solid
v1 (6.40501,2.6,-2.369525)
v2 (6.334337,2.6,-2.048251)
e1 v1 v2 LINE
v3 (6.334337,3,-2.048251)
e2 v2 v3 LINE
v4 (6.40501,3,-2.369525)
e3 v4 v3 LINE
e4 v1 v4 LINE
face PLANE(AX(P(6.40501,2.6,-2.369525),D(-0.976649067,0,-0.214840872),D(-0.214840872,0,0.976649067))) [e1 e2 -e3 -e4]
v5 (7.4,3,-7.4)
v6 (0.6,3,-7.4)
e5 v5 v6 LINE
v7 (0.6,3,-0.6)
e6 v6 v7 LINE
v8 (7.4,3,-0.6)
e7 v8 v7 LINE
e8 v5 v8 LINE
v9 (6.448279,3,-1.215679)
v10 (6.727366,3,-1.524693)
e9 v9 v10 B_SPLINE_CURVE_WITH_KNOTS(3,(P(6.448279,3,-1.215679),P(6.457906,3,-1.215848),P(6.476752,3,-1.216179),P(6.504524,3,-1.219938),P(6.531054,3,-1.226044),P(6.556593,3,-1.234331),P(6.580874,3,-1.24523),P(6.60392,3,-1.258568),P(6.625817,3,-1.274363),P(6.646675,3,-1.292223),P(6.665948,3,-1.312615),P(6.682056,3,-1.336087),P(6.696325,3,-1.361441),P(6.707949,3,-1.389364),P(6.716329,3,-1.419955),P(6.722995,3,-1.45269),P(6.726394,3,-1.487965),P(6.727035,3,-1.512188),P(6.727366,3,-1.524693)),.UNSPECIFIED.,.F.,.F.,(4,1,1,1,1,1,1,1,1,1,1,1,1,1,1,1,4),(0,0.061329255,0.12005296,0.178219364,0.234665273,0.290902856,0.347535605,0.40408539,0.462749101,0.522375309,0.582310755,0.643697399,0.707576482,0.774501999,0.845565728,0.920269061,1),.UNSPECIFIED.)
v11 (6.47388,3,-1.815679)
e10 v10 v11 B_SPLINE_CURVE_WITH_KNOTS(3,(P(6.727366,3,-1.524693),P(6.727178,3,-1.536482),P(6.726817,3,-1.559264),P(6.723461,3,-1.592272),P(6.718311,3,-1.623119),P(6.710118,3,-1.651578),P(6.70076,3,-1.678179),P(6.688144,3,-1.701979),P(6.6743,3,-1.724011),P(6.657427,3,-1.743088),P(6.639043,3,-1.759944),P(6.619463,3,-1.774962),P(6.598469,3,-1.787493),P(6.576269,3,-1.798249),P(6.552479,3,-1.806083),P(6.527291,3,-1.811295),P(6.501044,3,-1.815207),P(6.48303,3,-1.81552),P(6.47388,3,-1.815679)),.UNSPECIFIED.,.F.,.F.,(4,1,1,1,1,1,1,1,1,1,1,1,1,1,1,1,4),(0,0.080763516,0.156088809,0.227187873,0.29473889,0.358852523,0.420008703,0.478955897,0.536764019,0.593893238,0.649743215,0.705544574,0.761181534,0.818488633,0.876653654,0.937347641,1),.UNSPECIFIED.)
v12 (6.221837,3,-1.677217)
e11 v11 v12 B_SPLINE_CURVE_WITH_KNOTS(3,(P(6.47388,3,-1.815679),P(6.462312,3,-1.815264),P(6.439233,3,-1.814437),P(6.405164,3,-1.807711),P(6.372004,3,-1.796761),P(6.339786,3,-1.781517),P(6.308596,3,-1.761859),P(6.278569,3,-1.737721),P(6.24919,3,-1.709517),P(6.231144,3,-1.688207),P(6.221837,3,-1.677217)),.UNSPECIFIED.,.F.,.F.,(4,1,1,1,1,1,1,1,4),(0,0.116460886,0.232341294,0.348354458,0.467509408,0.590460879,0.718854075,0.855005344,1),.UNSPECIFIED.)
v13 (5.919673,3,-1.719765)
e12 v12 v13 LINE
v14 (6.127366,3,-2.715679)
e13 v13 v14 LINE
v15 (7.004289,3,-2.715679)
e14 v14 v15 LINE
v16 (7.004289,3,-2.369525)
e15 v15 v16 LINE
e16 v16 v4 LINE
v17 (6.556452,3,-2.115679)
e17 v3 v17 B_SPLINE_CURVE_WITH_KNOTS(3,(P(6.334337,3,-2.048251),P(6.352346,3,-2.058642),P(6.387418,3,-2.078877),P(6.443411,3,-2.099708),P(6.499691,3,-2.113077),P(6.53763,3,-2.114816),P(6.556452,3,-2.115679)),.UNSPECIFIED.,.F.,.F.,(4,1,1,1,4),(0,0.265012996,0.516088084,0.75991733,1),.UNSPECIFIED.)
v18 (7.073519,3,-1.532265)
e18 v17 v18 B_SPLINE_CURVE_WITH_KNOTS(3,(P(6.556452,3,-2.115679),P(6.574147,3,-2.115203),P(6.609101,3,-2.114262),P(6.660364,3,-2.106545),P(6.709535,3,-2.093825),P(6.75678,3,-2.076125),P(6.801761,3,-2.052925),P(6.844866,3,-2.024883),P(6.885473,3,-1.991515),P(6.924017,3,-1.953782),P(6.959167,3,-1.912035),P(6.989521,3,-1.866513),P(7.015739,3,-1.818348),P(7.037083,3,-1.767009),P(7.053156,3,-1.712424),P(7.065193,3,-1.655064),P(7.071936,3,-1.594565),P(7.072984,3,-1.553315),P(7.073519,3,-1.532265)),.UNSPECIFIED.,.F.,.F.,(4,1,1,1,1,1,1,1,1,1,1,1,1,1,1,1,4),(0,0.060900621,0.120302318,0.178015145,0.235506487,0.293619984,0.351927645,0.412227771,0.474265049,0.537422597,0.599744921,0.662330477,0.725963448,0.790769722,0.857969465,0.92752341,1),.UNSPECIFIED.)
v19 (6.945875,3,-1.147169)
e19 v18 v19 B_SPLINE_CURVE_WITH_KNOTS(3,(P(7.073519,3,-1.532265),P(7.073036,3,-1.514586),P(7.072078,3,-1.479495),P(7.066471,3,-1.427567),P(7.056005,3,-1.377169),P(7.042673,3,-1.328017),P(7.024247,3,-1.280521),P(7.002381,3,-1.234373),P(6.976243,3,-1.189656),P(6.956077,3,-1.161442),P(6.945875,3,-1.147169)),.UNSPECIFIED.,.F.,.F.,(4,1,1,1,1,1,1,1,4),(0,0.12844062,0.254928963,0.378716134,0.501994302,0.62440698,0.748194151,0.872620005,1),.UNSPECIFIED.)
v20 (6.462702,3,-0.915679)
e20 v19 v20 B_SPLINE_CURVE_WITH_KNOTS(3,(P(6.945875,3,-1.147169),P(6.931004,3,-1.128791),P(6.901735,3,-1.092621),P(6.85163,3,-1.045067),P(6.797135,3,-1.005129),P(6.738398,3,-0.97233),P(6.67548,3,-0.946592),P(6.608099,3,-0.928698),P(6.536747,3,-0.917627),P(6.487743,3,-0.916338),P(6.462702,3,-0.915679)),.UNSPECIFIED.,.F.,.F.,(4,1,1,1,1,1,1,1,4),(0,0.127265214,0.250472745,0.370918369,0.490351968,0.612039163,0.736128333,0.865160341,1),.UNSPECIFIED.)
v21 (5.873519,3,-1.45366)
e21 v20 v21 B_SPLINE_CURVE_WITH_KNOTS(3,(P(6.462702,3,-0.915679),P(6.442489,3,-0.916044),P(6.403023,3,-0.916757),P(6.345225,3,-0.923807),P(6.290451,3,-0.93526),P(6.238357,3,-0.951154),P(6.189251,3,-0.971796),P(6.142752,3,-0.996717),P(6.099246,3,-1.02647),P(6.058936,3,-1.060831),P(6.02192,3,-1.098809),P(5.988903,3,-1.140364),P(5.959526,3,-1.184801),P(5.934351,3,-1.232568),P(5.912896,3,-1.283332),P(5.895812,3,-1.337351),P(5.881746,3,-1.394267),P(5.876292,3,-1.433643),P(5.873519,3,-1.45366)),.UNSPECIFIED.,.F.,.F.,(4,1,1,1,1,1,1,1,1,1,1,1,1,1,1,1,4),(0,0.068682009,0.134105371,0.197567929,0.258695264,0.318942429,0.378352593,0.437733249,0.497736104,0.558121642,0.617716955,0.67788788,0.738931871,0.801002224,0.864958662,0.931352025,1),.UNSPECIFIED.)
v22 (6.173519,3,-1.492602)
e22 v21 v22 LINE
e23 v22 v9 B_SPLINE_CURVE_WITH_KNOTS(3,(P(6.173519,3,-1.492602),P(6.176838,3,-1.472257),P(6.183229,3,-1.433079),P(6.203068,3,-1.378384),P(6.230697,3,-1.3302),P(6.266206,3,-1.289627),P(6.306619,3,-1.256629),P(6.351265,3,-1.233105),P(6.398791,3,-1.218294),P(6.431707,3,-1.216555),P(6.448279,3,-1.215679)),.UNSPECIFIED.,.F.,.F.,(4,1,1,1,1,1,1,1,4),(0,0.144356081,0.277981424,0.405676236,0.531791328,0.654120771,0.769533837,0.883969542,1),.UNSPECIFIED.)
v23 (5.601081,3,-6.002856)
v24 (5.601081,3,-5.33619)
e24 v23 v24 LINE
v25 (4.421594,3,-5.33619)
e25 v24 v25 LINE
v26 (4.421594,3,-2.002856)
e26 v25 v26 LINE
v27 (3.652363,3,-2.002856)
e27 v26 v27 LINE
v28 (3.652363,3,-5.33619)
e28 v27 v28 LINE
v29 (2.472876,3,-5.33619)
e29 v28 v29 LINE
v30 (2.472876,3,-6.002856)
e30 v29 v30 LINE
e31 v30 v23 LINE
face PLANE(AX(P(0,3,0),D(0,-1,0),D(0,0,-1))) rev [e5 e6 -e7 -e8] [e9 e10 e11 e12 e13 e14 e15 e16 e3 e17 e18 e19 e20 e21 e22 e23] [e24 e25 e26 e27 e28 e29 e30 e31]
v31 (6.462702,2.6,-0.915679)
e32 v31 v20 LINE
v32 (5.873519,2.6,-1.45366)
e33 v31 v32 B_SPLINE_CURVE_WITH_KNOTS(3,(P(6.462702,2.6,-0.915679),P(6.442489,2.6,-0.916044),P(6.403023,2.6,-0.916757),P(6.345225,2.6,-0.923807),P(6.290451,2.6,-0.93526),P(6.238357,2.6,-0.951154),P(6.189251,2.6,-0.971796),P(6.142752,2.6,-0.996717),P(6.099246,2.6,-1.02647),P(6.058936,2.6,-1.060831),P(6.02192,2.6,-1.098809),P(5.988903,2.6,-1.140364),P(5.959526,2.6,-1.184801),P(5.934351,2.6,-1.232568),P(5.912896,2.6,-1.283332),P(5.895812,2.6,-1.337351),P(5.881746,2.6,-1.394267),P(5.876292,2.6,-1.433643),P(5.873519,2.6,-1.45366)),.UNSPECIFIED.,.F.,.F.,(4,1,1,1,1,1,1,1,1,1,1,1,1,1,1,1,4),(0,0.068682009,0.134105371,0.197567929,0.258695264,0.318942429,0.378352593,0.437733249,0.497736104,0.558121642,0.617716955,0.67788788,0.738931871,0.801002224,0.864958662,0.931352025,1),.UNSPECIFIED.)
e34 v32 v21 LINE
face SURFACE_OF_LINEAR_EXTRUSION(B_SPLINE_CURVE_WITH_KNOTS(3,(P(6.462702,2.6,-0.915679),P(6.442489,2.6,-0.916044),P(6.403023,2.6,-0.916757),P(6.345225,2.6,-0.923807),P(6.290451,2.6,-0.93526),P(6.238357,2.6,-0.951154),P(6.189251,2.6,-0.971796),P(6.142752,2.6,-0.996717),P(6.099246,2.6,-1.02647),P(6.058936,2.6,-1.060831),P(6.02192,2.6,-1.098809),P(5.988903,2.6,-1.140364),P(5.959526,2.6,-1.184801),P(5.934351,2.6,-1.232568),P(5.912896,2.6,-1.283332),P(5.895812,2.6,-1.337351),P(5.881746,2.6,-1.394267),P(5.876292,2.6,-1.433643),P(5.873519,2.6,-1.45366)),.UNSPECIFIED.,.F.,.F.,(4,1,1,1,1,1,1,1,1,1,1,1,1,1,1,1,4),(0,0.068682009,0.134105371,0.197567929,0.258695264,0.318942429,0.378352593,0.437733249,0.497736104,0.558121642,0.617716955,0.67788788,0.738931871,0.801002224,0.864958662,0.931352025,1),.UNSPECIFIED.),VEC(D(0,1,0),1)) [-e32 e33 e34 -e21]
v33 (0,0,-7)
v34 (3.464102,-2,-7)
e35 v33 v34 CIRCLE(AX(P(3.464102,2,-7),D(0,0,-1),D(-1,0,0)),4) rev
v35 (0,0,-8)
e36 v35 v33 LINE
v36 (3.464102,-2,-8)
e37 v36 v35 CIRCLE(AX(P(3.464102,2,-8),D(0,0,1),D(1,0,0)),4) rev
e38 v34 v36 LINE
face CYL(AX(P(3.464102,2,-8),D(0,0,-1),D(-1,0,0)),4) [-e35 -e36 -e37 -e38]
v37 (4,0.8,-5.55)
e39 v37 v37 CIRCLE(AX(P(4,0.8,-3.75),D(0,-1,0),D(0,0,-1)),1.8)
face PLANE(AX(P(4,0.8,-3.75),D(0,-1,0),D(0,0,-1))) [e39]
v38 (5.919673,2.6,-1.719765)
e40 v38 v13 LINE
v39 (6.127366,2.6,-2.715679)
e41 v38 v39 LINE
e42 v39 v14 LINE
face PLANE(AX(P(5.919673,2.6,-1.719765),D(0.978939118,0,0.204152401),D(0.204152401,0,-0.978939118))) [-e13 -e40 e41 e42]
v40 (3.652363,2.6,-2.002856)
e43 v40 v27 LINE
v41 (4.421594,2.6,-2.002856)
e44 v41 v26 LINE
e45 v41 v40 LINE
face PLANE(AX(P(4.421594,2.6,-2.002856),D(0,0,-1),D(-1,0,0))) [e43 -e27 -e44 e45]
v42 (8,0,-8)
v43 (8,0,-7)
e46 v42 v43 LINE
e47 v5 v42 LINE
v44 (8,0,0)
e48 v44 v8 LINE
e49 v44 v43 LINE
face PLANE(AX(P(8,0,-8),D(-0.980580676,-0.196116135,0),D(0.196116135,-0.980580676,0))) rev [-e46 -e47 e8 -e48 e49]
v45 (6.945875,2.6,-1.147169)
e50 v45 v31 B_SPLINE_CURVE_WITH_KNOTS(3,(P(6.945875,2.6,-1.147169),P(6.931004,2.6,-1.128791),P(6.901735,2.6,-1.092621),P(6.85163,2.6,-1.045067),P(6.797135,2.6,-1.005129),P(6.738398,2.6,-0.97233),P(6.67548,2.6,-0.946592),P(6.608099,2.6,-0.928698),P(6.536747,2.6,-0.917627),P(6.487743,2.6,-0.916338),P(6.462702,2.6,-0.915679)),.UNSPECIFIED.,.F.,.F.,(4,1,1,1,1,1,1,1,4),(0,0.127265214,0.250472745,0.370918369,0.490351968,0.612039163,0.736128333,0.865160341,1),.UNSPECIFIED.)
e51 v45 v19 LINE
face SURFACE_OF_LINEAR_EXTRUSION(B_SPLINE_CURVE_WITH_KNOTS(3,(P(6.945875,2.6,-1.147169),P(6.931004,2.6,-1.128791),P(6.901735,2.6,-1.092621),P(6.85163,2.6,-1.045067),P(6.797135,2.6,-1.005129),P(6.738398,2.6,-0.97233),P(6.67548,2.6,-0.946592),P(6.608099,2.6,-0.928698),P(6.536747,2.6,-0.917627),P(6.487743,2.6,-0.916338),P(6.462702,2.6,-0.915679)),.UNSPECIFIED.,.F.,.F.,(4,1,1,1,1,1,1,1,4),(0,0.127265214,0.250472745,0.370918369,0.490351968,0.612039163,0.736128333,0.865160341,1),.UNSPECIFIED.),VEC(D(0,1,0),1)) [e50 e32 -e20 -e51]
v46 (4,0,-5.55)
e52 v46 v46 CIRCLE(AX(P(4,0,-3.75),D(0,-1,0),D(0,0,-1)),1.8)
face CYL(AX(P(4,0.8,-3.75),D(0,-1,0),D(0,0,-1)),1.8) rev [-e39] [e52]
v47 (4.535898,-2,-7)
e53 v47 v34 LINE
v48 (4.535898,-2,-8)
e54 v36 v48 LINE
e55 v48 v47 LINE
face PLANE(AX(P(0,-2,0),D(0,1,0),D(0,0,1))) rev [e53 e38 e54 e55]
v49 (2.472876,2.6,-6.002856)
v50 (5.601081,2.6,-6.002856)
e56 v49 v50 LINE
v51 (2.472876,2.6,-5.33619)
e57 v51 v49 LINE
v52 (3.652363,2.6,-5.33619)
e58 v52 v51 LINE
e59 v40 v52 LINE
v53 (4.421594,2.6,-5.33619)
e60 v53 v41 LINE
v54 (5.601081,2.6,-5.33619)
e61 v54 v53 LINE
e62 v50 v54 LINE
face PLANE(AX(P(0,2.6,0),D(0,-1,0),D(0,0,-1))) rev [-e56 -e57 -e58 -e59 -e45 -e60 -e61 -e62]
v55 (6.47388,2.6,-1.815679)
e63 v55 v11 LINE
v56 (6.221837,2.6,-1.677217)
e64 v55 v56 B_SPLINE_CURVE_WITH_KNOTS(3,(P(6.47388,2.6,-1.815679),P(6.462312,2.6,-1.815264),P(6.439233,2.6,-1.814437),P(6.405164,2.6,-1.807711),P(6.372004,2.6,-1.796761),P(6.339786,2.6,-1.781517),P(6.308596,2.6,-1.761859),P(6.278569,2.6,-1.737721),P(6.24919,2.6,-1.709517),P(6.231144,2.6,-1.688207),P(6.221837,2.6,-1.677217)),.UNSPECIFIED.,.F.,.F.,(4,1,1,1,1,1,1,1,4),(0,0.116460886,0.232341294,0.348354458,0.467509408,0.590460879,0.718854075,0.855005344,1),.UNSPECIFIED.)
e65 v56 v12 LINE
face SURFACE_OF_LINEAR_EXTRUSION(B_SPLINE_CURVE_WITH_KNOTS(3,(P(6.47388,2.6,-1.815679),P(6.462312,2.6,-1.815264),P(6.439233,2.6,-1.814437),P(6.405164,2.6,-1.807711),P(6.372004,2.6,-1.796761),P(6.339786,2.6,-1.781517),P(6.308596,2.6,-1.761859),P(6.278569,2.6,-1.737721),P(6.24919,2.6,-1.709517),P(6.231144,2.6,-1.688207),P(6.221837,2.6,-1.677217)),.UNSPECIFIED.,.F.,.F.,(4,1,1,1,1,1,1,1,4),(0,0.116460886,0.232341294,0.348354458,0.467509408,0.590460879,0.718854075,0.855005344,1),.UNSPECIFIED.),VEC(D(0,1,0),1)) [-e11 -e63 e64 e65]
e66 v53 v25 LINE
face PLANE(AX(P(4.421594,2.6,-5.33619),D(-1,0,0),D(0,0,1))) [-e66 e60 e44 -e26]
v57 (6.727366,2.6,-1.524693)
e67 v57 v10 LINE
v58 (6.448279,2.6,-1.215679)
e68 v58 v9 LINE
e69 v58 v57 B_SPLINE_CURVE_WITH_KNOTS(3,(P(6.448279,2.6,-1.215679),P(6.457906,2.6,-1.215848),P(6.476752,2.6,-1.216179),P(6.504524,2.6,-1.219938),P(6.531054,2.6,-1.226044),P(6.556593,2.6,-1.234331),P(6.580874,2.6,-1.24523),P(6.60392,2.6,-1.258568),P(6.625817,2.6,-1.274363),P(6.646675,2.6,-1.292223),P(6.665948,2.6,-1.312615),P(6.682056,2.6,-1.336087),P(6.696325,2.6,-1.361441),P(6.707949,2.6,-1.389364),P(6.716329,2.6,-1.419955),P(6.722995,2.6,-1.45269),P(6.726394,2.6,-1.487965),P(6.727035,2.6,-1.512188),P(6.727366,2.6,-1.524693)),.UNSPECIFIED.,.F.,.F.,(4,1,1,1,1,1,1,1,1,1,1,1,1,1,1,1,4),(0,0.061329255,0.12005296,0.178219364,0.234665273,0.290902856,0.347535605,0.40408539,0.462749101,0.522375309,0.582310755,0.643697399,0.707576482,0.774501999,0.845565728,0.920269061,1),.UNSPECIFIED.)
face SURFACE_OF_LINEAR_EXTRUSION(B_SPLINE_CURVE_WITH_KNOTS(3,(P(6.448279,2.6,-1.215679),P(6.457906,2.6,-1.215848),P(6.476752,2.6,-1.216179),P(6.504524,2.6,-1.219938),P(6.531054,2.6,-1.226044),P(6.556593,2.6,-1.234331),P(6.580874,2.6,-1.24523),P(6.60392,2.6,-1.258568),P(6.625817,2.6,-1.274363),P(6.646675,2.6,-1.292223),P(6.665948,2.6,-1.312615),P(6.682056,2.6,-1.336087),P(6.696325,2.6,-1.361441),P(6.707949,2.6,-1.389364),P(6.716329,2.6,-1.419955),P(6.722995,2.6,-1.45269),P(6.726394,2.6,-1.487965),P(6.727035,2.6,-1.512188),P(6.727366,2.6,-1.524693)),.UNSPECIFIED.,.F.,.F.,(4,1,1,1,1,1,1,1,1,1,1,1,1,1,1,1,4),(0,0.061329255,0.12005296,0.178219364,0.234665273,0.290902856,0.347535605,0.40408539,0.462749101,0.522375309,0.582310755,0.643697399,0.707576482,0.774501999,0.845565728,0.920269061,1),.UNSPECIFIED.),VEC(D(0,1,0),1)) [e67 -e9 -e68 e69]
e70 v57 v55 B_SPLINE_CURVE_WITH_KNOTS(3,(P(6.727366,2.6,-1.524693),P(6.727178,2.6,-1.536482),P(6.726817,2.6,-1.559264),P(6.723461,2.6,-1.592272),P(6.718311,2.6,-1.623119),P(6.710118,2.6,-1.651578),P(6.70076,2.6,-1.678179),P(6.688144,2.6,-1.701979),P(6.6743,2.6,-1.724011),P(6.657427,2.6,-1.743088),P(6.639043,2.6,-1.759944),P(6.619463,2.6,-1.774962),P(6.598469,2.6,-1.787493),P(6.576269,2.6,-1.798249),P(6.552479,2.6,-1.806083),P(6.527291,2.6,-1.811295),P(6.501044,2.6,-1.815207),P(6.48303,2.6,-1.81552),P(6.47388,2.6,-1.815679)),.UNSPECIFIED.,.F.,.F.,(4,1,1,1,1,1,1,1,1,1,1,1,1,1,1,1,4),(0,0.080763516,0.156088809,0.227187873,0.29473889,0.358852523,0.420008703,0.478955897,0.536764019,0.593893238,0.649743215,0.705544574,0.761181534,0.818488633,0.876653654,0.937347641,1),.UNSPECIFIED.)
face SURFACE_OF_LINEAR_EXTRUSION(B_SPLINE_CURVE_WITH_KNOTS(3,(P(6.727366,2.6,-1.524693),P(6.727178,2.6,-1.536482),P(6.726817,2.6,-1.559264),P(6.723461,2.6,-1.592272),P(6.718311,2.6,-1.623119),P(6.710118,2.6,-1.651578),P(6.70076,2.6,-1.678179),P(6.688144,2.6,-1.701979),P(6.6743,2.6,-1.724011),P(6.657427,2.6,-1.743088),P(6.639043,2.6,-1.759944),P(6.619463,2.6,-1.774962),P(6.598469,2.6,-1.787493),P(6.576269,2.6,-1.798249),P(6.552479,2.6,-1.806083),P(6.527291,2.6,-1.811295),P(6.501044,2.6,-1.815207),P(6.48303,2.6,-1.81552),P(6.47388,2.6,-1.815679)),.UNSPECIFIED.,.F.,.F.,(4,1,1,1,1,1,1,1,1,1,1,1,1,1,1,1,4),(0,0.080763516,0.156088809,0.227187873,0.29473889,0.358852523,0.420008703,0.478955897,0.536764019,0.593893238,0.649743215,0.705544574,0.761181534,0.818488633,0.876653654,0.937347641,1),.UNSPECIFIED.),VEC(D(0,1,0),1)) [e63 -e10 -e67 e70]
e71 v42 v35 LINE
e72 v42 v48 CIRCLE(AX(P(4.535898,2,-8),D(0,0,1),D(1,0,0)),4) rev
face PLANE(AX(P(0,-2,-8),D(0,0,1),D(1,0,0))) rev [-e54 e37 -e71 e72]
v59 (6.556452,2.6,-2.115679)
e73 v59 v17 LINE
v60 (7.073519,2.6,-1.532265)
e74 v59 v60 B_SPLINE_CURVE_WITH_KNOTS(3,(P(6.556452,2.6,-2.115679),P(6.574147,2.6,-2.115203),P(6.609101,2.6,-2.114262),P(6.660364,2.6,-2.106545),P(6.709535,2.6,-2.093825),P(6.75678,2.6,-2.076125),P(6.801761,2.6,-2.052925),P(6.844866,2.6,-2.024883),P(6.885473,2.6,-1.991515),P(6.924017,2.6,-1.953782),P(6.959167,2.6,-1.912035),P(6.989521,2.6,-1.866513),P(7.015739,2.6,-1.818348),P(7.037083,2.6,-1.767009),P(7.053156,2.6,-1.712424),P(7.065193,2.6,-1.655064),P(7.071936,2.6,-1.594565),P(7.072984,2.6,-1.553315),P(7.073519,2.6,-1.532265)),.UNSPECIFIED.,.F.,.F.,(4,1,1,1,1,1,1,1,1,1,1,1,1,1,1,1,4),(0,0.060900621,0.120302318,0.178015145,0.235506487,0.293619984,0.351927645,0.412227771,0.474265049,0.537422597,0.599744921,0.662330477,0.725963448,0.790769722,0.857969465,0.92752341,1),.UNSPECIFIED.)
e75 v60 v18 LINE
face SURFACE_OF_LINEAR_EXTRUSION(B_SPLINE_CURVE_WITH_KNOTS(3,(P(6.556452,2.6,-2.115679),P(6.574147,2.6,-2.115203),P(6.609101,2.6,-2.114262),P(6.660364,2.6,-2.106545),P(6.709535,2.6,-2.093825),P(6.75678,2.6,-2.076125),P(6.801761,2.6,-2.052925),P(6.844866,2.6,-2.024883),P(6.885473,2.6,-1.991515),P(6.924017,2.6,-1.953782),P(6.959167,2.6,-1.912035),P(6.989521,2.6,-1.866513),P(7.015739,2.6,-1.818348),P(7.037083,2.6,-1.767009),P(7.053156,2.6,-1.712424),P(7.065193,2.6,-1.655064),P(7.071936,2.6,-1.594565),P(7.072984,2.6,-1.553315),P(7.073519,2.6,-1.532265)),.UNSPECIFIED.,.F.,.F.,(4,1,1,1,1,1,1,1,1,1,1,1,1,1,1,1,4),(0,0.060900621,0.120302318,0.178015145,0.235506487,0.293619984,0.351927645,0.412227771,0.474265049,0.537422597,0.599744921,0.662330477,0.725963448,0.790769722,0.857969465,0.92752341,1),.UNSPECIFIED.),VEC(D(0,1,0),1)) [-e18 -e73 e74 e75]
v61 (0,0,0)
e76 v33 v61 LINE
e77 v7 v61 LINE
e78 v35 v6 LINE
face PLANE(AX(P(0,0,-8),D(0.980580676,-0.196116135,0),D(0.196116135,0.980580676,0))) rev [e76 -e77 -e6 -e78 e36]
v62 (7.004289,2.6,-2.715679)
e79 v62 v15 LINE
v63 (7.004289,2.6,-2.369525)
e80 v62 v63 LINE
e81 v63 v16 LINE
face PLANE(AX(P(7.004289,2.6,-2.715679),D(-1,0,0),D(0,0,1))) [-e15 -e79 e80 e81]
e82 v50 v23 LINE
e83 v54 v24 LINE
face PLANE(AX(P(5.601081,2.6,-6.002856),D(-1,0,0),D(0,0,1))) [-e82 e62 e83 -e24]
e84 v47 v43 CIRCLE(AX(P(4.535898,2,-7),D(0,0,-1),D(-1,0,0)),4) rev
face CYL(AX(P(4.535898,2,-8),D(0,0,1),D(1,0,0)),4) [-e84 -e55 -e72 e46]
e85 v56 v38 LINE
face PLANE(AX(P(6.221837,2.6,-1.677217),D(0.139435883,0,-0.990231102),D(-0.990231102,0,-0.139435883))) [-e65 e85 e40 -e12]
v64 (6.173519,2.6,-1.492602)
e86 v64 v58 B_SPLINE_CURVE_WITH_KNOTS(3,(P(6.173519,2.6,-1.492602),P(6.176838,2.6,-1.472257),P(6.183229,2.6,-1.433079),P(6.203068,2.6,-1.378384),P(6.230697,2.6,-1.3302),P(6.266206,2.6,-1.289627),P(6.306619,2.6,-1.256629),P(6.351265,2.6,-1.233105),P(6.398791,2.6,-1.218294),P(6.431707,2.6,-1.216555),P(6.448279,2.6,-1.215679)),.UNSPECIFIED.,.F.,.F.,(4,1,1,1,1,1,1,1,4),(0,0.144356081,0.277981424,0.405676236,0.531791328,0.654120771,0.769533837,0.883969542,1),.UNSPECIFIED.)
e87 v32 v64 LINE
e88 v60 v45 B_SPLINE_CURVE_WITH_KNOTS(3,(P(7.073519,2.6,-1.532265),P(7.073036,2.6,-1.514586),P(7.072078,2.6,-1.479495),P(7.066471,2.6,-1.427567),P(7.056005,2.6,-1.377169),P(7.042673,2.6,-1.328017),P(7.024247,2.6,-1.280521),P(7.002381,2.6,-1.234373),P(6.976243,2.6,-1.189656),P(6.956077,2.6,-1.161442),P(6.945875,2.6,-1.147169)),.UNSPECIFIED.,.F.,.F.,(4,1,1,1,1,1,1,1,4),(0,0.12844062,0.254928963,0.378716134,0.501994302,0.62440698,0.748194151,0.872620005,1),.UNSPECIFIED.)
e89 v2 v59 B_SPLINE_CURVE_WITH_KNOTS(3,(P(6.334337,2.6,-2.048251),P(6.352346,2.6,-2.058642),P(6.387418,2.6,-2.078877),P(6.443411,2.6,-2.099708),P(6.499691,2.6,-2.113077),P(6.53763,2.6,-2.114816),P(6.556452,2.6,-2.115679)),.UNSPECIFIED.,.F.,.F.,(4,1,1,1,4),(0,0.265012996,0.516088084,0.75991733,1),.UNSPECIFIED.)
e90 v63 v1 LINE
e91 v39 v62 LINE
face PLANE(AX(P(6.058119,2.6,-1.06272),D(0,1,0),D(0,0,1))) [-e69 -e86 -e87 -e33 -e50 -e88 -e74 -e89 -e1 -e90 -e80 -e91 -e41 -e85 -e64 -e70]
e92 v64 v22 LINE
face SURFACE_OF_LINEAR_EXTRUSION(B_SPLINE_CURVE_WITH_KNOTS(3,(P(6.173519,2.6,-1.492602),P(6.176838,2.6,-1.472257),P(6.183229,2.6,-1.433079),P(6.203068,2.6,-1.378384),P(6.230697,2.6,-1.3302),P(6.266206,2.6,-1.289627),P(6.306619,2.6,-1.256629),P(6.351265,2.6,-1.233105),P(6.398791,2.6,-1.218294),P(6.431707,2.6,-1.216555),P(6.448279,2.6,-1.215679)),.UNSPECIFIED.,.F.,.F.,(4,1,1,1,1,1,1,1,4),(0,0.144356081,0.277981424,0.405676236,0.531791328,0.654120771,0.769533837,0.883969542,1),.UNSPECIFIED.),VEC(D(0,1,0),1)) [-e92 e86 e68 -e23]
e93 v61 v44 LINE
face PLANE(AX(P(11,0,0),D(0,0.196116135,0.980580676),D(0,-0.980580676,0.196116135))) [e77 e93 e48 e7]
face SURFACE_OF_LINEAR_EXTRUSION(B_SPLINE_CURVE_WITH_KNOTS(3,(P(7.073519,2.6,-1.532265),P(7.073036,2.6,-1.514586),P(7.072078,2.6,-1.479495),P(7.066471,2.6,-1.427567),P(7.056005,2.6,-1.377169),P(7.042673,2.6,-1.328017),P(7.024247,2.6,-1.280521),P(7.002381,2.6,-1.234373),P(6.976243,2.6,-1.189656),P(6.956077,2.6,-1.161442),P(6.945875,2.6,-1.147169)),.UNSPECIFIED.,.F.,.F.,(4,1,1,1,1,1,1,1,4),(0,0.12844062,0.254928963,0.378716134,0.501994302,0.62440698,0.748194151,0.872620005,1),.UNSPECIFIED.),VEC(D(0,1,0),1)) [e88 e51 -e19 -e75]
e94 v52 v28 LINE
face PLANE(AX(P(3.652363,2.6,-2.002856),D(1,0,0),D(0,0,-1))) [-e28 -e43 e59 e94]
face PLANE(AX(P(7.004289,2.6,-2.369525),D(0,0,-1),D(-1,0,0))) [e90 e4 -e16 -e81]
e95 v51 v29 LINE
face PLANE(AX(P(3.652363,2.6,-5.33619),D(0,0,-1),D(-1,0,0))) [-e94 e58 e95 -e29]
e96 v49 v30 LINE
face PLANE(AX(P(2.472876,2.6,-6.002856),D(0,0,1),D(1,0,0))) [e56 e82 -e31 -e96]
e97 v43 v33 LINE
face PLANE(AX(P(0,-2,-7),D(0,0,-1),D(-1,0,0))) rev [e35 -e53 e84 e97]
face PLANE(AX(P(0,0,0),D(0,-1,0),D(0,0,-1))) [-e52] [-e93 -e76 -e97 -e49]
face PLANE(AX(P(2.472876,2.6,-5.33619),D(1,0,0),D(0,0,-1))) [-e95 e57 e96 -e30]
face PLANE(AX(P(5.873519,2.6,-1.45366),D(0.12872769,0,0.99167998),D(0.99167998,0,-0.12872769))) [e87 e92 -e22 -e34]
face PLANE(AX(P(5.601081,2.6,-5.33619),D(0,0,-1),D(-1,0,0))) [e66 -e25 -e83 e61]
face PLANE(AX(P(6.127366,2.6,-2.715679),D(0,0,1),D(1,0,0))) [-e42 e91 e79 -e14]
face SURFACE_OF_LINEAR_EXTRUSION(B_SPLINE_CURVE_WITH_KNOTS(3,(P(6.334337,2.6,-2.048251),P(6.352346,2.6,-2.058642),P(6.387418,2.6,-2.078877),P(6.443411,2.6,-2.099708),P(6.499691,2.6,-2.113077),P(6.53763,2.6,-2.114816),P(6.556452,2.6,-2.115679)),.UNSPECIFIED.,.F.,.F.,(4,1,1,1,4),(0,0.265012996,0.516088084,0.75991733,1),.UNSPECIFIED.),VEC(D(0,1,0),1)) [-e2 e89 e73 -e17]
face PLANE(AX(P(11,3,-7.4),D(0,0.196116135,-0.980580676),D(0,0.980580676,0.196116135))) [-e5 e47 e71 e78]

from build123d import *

# Parameters (mm, degrees)
SKETCH1_W               = 8
SKETCH1_H               = 8
BOSS_EXTRUDE1_DEPTH     = 3
CUT_EXTRUDE1_DEPTH      = 12.704699911
CUT_EXTRUDE1_DEPTH_BACK = 12.704699911
CUT_EXTRUDE2_DEPTH      = 11
SKETCH4_R               = 1.8
CUT_EXTRUDE3_DEPTH      = 0.8
SKETCH5_W               = 8
SKETCH5_H               = 1
BOSS_EXTRUDE2_DEPTH     = 2
FILLET1_R               = 4
CUT_EXTRUDE4_DEPTH      = 0.4
CUT_EXTRUDE5_DEPTH      = 0.4


with BuildPart() as part:
    # Sketch1 → Boss-Extrude1 (new body)
    with BuildSketch(Plane(origin=(0, 0, 0), x_dir=(1, 0, 0), z_dir=(0, 1, 0))):
        with Locations((4, 4)):
            Rectangle(SKETCH1_W, SKETCH1_H)
    extrude(amount=BOSS_EXTRUDE1_DEPTH)

    # Sketch2 → Cut-Extrude1 (cut, two sides: drawn at the far end of the back side and taken through both)
    with BuildSketch(Plane.XY.offset(-CUT_EXTRUDE1_DEPTH_BACK)):
        Polygon((0, 0), (0.6, 3), (0, 3), align=None)
        Polygon((8, 0), (7.4, 3), (8, 3), align=None)
    extrude(amount=CUT_EXTRUDE1_DEPTH + CUT_EXTRUDE1_DEPTH_BACK, mode=Mode.SUBTRACT)

    # Sketch3 → Cut-Extrude2 (cut)
    with BuildSketch(Plane(origin=(0, 0, 0), x_dir=(0, 0, -1), z_dir=(1, 0, 0))):
        Polygon((0, 0), (0.6, 3), (0, 3), align=None)
        Polygon((8, 3), (7.4, 3), (8, 0), align=None)
    extrude(amount=CUT_EXTRUDE2_DEPTH, mode=Mode.SUBTRACT)

    # Sketch4 → Cut-Extrude3 (cut)
    with BuildSketch(Plane.XZ):
        with Locations(Location((4, -3.75, 0), (0, 0, 270))):
            Circle(SKETCH4_R)
    extrude(amount=-CUT_EXTRUDE3_DEPTH, mode=Mode.SUBTRACT)

    # Sketch5 → Boss-Extrude2 (add)
    with BuildSketch(Plane.XZ):
        with Locations((4, -7.5)):
            Rectangle(SKETCH5_W, SKETCH5_H)
    extrude(amount=BOSS_EXTRUDE2_DEPTH)

    # Fillet1
    # the kernel refuses this fillet: 4 mm, written as the material it takes off along each edge
    with BuildSketch(Plane(origin=(8, -2, -16.660254038), x_dir=(0, 1, 0), z_dir=(0, 0, 1)), Plane(origin=(0, -2, 1.660254038), x_dir=(0, 1, 0), z_dir=(0, 0, -1))) as fillet1_piece_1:
        with BuildLine():
            CenterArc((4, 3.464101615), FILLET1_R, 180, 60)
            Line((0, 3.464101615), (-0.08, 3.464101615))
            Line((-0.08, 3.464101615), (-0.08, 0))
            Line((-0.08, 0), (0, -0.08))
            ThreePointArc((0, -0.08), (1, -0.08), (1.96, -0.069282032))
            Line((1.96, -0.069282032), (2, 0))
        make_face()
    extrude(amount=18.320508076, mode=Mode.SUBTRACT)

    # Sketch6 → Cut-Extrude4 (cut)
    with BuildSketch(Plane(origin=(0, 3, 0), x_dir=(1, 0, 0), z_dir=(0, 1, 0))):
        Polygon((3.652362984, 2.002856352), (3.652362984, 5.336189685), (2.472875805, 5.336189685), (2.472875805, 6.002856352), (5.601080933, 6.002856352), (5.601080933, 5.336189685), (4.421593754, 5.336189685), (4.421593754, 2.002856352), align=None)
    extrude(amount=-CUT_EXTRUDE4_DEPTH, mode=Mode.SUBTRACT)

    # Sketch7 → Cut-Extrude5 (cut)
    with BuildSketch(Plane(origin=(0, 3, 0), x_dir=(1, 0, 0), z_dir=(0, 1, 0))):
        with BuildLine():
            Line((5.873519392, 1.453659702), (6.173519392, 1.492602009))
            add(Edge.make_bspline(
                [(6.173519392, 1.492602009), (6.1768382, 1.472256976), (6.18322911, 1.433079261), (6.203068429, 1.378384162), (6.230697403, 1.330199963), (6.266205672, 1.289626965), (6.30661854, 1.256629271), (6.351264588, 1.233104776), (6.398791495, 1.218293755), (6.431707248, 1.216554551), (6.448279008, 1.215678932)],
                knots=[0, 0, 0, 0, 1.154848647, 2.223851388, 3.245409892, 4.254330626, 5.232966172, 6.156270698, 7.071756339, 8, 8, 8, 8], degree=3))
            add(Edge.make_bspline(
                [(6.448279008, 1.215678932), (6.457906388, 1.215848075), (6.476752132, 1.216179174), (6.504524052, 1.219937575), (6.531053869, 1.226043662), (6.55659259, 1.234330756), (6.580874213, 1.245230043), (6.603920328, 1.258567919), (6.625817059, 1.274363121), (6.646675237, 1.292223374), (6.665948362, 1.312615024), (6.682055884, 1.336087325), (6.696325112, 1.361440746), (6.707949377, 1.389364059), (6.716328852, 1.41995512), (6.722995329, 1.45269023), (6.726393576, 1.487964606), (6.7270346, 1.51218758), (6.727365546, 1.524693355)],
                knots=[0, 0, 0, 0, 0.981268084, 1.920847364, 2.851509818, 3.754644372, 4.654445699, 5.560569672, 6.465366234, 7.403985617, 8.358004942, 9.316972086, 10.299158387, 11.321223707, 12.392031981, 13.529051644, 14.724304971, 16, 16, 16, 16], degree=3))
            add(Edge.make_bspline(
                [(6.727365546, 1.524693355), (6.727178419, 1.536481523), (6.726816764, 1.559264099), (6.723461454, 1.592272205), (6.718311073, 1.623118586), (6.710117629, 1.651577708), (6.700760071, 1.678178631), (6.688143723, 1.701978526), (6.674300374, 1.724011312), (6.657427434, 1.743088207), (6.639042824, 1.759943867), (6.619463278, 1.774961982), (6.598469004, 1.787493154), (6.576269045, 1.79824857), (6.552478567, 1.806082762), (6.527290541, 1.811294815), (6.501043648, 1.815207497), (6.483029864, 1.815520133), (6.473879969, 1.815678932)],
                knots=[0, 0, 0, 0, 1.29221626, 2.497420946, 3.635005972, 4.715822244, 5.741640361, 6.720139245, 7.663294346, 8.588224307, 9.502291809, 10.395891443, 11.288713187, 12.178904539, 13.095818132, 14.026458458, 14.997562253, 16, 16, 16, 16], degree=3))
            add(Edge.make_bspline(
                [(6.473879969, 1.815678932), (6.462311673, 1.815264192), (6.439232742, 1.814436778), (6.405164091, 1.807710713), (6.372003678, 1.796760631), (6.339785969, 1.781517356), (6.308596201, 1.761859078), (6.278569411, 1.737720606), (6.249190173, 1.70951724), (6.23114374, 1.688207441), (6.2218367, 1.677217394)],
                knots=[0, 0, 0, 0, 0.931687088, 1.85873035, 2.786835662, 3.740075265, 4.723687035, 5.750832598, 6.840042753, 8, 8, 8, 8], degree=3))
            Line((6.2218367, 1.677217394), (5.919673238, 1.719765471))
            Line((5.919673238, 1.719765471), (6.127365546, 2.715678932))
            Line((6.127365546, 2.715678932), (7.004288623, 2.715678932))
            Line((7.004288623, 2.715678932), (7.004288623, 2.369525086))
            Line((7.004288623, 2.369525086), (6.405009777, 2.369525086))
            Line((6.405009777, 2.369525086), (6.3343367, 2.048251048))
            add(Edge.make_bspline(
                [(6.3343367, 2.048251048), (6.352346227, 2.058641979), (6.3874181, 2.078877348), (6.443410579, 2.099707804), (6.499690691, 2.113077126), (6.537629531, 2.114816152), (6.556452085, 2.115678932)],
                knots=[0, 0, 0, 0, 1.060051984, 2.064352337, 3.039669322, 4, 4, 4, 4], degree=3))
            add(Edge.make_bspline(
                [(6.556452085, 2.115678932), (6.574146885, 2.115202759), (6.60910097, 2.114262131), (6.660364054, 2.106544582), (6.709535097, 2.093825268), (6.756780138, 2.076125011), (6.801761249, 2.052924592), (6.844866196, 2.024883357), (6.885472675, 1.991514713), (6.924016987, 1.953782044), (6.959166694, 1.912035385), (6.989521263, 1.866512768), (7.015738821, 1.818347997), (7.037083021, 1.767008911), (7.053155816, 1.712424088), (7.065192785, 1.655063547), (7.07193581, 1.594565079), (7.072984339, 1.553314949), (7.073519392, 1.532265471)],
                knots=[0, 0, 0, 0, 0.974409932, 1.924837087, 2.848242317, 3.768103797, 4.697919751, 5.630842317, 6.595644344, 7.588240789, 8.59876155, 9.595918743, 10.597287627, 11.615415169, 12.652315553, 13.727511434, 14.840374562, 16, 16, 16, 16], degree=3))
            add(Edge.make_bspline(
                [(7.073519392, 1.532265471), (7.073036469, 1.514585649), (7.072077961, 1.479494734), (7.066471429, 1.42756738), (7.056005109, 1.377169317), (7.042672536, 1.328016631), (7.024246745, 1.280521142), (7.002381003, 1.234373213), (6.976242653, 1.189655711), (6.956076521, 1.161441782), (6.945875162, 1.147169317)],
                knots=[0, 0, 0, 0, 1.027524957, 2.039431707, 3.02972907, 4.015954419, 4.995255842, 5.985553205, 6.980960039, 8, 8, 8, 8], degree=3))
            add(Edge.make_bspline(
                [(6.945875162, 1.147169317), (6.931003624, 1.128791302), (6.901734709, 1.092621232), (6.851630217, 1.045066578), (6.797135444, 1.00512898), (6.738397987, 0.97233011), (6.675480422, 0.946591981), (6.608098871, 0.928697649), (6.536747385, 0.917626673), (6.487743367, 0.916337636), (6.462702085, 0.915678932)],
                knots=[0, 0, 0, 0, 1.018121711, 2.003781959, 2.967346956, 3.92281574, 4.896313303, 5.889026666, 6.921282725, 8, 8, 8, 8], degree=3))
            add(Edge.make_bspline(
                [(6.462702085, 0.915678932), (6.442489279, 0.916044029), (6.403022672, 0.9167569), (6.345224712, 0.92380666), (6.290451314, 0.935259909), (6.238356922, 0.95115359), (6.18925085, 0.971795666), (6.142751555, 0.99671717), (6.099246456, 1.026470486), (6.058935891, 1.060830838), (6.021919655, 1.09880899), (5.988902802, 1.140363971), (5.959526451, 1.184800784), (5.934351052, 1.232568443), (5.912895663, 1.28333195), (5.895811978, 1.337351468), (5.881746134, 1.394266746), (5.876291993, 1.433642912), (5.873519392, 1.453659702)],
                knots=[0, 0, 0, 0, 1.098912142, 2.145685936, 3.161086862, 4.139124218, 5.10307886, 6.053641493, 7.003731987, 7.963777669, 8.929946266, 9.883471279, 10.846206077, 11.822909928, 12.81603559, 13.839338588, 14.901632394, 16, 16, 16, 16], degree=3))
        make_face()
    extrude(amount=-CUT_EXTRUDE5_DEPTH, mode=Mode.SUBTRACT)


solid = part.part
